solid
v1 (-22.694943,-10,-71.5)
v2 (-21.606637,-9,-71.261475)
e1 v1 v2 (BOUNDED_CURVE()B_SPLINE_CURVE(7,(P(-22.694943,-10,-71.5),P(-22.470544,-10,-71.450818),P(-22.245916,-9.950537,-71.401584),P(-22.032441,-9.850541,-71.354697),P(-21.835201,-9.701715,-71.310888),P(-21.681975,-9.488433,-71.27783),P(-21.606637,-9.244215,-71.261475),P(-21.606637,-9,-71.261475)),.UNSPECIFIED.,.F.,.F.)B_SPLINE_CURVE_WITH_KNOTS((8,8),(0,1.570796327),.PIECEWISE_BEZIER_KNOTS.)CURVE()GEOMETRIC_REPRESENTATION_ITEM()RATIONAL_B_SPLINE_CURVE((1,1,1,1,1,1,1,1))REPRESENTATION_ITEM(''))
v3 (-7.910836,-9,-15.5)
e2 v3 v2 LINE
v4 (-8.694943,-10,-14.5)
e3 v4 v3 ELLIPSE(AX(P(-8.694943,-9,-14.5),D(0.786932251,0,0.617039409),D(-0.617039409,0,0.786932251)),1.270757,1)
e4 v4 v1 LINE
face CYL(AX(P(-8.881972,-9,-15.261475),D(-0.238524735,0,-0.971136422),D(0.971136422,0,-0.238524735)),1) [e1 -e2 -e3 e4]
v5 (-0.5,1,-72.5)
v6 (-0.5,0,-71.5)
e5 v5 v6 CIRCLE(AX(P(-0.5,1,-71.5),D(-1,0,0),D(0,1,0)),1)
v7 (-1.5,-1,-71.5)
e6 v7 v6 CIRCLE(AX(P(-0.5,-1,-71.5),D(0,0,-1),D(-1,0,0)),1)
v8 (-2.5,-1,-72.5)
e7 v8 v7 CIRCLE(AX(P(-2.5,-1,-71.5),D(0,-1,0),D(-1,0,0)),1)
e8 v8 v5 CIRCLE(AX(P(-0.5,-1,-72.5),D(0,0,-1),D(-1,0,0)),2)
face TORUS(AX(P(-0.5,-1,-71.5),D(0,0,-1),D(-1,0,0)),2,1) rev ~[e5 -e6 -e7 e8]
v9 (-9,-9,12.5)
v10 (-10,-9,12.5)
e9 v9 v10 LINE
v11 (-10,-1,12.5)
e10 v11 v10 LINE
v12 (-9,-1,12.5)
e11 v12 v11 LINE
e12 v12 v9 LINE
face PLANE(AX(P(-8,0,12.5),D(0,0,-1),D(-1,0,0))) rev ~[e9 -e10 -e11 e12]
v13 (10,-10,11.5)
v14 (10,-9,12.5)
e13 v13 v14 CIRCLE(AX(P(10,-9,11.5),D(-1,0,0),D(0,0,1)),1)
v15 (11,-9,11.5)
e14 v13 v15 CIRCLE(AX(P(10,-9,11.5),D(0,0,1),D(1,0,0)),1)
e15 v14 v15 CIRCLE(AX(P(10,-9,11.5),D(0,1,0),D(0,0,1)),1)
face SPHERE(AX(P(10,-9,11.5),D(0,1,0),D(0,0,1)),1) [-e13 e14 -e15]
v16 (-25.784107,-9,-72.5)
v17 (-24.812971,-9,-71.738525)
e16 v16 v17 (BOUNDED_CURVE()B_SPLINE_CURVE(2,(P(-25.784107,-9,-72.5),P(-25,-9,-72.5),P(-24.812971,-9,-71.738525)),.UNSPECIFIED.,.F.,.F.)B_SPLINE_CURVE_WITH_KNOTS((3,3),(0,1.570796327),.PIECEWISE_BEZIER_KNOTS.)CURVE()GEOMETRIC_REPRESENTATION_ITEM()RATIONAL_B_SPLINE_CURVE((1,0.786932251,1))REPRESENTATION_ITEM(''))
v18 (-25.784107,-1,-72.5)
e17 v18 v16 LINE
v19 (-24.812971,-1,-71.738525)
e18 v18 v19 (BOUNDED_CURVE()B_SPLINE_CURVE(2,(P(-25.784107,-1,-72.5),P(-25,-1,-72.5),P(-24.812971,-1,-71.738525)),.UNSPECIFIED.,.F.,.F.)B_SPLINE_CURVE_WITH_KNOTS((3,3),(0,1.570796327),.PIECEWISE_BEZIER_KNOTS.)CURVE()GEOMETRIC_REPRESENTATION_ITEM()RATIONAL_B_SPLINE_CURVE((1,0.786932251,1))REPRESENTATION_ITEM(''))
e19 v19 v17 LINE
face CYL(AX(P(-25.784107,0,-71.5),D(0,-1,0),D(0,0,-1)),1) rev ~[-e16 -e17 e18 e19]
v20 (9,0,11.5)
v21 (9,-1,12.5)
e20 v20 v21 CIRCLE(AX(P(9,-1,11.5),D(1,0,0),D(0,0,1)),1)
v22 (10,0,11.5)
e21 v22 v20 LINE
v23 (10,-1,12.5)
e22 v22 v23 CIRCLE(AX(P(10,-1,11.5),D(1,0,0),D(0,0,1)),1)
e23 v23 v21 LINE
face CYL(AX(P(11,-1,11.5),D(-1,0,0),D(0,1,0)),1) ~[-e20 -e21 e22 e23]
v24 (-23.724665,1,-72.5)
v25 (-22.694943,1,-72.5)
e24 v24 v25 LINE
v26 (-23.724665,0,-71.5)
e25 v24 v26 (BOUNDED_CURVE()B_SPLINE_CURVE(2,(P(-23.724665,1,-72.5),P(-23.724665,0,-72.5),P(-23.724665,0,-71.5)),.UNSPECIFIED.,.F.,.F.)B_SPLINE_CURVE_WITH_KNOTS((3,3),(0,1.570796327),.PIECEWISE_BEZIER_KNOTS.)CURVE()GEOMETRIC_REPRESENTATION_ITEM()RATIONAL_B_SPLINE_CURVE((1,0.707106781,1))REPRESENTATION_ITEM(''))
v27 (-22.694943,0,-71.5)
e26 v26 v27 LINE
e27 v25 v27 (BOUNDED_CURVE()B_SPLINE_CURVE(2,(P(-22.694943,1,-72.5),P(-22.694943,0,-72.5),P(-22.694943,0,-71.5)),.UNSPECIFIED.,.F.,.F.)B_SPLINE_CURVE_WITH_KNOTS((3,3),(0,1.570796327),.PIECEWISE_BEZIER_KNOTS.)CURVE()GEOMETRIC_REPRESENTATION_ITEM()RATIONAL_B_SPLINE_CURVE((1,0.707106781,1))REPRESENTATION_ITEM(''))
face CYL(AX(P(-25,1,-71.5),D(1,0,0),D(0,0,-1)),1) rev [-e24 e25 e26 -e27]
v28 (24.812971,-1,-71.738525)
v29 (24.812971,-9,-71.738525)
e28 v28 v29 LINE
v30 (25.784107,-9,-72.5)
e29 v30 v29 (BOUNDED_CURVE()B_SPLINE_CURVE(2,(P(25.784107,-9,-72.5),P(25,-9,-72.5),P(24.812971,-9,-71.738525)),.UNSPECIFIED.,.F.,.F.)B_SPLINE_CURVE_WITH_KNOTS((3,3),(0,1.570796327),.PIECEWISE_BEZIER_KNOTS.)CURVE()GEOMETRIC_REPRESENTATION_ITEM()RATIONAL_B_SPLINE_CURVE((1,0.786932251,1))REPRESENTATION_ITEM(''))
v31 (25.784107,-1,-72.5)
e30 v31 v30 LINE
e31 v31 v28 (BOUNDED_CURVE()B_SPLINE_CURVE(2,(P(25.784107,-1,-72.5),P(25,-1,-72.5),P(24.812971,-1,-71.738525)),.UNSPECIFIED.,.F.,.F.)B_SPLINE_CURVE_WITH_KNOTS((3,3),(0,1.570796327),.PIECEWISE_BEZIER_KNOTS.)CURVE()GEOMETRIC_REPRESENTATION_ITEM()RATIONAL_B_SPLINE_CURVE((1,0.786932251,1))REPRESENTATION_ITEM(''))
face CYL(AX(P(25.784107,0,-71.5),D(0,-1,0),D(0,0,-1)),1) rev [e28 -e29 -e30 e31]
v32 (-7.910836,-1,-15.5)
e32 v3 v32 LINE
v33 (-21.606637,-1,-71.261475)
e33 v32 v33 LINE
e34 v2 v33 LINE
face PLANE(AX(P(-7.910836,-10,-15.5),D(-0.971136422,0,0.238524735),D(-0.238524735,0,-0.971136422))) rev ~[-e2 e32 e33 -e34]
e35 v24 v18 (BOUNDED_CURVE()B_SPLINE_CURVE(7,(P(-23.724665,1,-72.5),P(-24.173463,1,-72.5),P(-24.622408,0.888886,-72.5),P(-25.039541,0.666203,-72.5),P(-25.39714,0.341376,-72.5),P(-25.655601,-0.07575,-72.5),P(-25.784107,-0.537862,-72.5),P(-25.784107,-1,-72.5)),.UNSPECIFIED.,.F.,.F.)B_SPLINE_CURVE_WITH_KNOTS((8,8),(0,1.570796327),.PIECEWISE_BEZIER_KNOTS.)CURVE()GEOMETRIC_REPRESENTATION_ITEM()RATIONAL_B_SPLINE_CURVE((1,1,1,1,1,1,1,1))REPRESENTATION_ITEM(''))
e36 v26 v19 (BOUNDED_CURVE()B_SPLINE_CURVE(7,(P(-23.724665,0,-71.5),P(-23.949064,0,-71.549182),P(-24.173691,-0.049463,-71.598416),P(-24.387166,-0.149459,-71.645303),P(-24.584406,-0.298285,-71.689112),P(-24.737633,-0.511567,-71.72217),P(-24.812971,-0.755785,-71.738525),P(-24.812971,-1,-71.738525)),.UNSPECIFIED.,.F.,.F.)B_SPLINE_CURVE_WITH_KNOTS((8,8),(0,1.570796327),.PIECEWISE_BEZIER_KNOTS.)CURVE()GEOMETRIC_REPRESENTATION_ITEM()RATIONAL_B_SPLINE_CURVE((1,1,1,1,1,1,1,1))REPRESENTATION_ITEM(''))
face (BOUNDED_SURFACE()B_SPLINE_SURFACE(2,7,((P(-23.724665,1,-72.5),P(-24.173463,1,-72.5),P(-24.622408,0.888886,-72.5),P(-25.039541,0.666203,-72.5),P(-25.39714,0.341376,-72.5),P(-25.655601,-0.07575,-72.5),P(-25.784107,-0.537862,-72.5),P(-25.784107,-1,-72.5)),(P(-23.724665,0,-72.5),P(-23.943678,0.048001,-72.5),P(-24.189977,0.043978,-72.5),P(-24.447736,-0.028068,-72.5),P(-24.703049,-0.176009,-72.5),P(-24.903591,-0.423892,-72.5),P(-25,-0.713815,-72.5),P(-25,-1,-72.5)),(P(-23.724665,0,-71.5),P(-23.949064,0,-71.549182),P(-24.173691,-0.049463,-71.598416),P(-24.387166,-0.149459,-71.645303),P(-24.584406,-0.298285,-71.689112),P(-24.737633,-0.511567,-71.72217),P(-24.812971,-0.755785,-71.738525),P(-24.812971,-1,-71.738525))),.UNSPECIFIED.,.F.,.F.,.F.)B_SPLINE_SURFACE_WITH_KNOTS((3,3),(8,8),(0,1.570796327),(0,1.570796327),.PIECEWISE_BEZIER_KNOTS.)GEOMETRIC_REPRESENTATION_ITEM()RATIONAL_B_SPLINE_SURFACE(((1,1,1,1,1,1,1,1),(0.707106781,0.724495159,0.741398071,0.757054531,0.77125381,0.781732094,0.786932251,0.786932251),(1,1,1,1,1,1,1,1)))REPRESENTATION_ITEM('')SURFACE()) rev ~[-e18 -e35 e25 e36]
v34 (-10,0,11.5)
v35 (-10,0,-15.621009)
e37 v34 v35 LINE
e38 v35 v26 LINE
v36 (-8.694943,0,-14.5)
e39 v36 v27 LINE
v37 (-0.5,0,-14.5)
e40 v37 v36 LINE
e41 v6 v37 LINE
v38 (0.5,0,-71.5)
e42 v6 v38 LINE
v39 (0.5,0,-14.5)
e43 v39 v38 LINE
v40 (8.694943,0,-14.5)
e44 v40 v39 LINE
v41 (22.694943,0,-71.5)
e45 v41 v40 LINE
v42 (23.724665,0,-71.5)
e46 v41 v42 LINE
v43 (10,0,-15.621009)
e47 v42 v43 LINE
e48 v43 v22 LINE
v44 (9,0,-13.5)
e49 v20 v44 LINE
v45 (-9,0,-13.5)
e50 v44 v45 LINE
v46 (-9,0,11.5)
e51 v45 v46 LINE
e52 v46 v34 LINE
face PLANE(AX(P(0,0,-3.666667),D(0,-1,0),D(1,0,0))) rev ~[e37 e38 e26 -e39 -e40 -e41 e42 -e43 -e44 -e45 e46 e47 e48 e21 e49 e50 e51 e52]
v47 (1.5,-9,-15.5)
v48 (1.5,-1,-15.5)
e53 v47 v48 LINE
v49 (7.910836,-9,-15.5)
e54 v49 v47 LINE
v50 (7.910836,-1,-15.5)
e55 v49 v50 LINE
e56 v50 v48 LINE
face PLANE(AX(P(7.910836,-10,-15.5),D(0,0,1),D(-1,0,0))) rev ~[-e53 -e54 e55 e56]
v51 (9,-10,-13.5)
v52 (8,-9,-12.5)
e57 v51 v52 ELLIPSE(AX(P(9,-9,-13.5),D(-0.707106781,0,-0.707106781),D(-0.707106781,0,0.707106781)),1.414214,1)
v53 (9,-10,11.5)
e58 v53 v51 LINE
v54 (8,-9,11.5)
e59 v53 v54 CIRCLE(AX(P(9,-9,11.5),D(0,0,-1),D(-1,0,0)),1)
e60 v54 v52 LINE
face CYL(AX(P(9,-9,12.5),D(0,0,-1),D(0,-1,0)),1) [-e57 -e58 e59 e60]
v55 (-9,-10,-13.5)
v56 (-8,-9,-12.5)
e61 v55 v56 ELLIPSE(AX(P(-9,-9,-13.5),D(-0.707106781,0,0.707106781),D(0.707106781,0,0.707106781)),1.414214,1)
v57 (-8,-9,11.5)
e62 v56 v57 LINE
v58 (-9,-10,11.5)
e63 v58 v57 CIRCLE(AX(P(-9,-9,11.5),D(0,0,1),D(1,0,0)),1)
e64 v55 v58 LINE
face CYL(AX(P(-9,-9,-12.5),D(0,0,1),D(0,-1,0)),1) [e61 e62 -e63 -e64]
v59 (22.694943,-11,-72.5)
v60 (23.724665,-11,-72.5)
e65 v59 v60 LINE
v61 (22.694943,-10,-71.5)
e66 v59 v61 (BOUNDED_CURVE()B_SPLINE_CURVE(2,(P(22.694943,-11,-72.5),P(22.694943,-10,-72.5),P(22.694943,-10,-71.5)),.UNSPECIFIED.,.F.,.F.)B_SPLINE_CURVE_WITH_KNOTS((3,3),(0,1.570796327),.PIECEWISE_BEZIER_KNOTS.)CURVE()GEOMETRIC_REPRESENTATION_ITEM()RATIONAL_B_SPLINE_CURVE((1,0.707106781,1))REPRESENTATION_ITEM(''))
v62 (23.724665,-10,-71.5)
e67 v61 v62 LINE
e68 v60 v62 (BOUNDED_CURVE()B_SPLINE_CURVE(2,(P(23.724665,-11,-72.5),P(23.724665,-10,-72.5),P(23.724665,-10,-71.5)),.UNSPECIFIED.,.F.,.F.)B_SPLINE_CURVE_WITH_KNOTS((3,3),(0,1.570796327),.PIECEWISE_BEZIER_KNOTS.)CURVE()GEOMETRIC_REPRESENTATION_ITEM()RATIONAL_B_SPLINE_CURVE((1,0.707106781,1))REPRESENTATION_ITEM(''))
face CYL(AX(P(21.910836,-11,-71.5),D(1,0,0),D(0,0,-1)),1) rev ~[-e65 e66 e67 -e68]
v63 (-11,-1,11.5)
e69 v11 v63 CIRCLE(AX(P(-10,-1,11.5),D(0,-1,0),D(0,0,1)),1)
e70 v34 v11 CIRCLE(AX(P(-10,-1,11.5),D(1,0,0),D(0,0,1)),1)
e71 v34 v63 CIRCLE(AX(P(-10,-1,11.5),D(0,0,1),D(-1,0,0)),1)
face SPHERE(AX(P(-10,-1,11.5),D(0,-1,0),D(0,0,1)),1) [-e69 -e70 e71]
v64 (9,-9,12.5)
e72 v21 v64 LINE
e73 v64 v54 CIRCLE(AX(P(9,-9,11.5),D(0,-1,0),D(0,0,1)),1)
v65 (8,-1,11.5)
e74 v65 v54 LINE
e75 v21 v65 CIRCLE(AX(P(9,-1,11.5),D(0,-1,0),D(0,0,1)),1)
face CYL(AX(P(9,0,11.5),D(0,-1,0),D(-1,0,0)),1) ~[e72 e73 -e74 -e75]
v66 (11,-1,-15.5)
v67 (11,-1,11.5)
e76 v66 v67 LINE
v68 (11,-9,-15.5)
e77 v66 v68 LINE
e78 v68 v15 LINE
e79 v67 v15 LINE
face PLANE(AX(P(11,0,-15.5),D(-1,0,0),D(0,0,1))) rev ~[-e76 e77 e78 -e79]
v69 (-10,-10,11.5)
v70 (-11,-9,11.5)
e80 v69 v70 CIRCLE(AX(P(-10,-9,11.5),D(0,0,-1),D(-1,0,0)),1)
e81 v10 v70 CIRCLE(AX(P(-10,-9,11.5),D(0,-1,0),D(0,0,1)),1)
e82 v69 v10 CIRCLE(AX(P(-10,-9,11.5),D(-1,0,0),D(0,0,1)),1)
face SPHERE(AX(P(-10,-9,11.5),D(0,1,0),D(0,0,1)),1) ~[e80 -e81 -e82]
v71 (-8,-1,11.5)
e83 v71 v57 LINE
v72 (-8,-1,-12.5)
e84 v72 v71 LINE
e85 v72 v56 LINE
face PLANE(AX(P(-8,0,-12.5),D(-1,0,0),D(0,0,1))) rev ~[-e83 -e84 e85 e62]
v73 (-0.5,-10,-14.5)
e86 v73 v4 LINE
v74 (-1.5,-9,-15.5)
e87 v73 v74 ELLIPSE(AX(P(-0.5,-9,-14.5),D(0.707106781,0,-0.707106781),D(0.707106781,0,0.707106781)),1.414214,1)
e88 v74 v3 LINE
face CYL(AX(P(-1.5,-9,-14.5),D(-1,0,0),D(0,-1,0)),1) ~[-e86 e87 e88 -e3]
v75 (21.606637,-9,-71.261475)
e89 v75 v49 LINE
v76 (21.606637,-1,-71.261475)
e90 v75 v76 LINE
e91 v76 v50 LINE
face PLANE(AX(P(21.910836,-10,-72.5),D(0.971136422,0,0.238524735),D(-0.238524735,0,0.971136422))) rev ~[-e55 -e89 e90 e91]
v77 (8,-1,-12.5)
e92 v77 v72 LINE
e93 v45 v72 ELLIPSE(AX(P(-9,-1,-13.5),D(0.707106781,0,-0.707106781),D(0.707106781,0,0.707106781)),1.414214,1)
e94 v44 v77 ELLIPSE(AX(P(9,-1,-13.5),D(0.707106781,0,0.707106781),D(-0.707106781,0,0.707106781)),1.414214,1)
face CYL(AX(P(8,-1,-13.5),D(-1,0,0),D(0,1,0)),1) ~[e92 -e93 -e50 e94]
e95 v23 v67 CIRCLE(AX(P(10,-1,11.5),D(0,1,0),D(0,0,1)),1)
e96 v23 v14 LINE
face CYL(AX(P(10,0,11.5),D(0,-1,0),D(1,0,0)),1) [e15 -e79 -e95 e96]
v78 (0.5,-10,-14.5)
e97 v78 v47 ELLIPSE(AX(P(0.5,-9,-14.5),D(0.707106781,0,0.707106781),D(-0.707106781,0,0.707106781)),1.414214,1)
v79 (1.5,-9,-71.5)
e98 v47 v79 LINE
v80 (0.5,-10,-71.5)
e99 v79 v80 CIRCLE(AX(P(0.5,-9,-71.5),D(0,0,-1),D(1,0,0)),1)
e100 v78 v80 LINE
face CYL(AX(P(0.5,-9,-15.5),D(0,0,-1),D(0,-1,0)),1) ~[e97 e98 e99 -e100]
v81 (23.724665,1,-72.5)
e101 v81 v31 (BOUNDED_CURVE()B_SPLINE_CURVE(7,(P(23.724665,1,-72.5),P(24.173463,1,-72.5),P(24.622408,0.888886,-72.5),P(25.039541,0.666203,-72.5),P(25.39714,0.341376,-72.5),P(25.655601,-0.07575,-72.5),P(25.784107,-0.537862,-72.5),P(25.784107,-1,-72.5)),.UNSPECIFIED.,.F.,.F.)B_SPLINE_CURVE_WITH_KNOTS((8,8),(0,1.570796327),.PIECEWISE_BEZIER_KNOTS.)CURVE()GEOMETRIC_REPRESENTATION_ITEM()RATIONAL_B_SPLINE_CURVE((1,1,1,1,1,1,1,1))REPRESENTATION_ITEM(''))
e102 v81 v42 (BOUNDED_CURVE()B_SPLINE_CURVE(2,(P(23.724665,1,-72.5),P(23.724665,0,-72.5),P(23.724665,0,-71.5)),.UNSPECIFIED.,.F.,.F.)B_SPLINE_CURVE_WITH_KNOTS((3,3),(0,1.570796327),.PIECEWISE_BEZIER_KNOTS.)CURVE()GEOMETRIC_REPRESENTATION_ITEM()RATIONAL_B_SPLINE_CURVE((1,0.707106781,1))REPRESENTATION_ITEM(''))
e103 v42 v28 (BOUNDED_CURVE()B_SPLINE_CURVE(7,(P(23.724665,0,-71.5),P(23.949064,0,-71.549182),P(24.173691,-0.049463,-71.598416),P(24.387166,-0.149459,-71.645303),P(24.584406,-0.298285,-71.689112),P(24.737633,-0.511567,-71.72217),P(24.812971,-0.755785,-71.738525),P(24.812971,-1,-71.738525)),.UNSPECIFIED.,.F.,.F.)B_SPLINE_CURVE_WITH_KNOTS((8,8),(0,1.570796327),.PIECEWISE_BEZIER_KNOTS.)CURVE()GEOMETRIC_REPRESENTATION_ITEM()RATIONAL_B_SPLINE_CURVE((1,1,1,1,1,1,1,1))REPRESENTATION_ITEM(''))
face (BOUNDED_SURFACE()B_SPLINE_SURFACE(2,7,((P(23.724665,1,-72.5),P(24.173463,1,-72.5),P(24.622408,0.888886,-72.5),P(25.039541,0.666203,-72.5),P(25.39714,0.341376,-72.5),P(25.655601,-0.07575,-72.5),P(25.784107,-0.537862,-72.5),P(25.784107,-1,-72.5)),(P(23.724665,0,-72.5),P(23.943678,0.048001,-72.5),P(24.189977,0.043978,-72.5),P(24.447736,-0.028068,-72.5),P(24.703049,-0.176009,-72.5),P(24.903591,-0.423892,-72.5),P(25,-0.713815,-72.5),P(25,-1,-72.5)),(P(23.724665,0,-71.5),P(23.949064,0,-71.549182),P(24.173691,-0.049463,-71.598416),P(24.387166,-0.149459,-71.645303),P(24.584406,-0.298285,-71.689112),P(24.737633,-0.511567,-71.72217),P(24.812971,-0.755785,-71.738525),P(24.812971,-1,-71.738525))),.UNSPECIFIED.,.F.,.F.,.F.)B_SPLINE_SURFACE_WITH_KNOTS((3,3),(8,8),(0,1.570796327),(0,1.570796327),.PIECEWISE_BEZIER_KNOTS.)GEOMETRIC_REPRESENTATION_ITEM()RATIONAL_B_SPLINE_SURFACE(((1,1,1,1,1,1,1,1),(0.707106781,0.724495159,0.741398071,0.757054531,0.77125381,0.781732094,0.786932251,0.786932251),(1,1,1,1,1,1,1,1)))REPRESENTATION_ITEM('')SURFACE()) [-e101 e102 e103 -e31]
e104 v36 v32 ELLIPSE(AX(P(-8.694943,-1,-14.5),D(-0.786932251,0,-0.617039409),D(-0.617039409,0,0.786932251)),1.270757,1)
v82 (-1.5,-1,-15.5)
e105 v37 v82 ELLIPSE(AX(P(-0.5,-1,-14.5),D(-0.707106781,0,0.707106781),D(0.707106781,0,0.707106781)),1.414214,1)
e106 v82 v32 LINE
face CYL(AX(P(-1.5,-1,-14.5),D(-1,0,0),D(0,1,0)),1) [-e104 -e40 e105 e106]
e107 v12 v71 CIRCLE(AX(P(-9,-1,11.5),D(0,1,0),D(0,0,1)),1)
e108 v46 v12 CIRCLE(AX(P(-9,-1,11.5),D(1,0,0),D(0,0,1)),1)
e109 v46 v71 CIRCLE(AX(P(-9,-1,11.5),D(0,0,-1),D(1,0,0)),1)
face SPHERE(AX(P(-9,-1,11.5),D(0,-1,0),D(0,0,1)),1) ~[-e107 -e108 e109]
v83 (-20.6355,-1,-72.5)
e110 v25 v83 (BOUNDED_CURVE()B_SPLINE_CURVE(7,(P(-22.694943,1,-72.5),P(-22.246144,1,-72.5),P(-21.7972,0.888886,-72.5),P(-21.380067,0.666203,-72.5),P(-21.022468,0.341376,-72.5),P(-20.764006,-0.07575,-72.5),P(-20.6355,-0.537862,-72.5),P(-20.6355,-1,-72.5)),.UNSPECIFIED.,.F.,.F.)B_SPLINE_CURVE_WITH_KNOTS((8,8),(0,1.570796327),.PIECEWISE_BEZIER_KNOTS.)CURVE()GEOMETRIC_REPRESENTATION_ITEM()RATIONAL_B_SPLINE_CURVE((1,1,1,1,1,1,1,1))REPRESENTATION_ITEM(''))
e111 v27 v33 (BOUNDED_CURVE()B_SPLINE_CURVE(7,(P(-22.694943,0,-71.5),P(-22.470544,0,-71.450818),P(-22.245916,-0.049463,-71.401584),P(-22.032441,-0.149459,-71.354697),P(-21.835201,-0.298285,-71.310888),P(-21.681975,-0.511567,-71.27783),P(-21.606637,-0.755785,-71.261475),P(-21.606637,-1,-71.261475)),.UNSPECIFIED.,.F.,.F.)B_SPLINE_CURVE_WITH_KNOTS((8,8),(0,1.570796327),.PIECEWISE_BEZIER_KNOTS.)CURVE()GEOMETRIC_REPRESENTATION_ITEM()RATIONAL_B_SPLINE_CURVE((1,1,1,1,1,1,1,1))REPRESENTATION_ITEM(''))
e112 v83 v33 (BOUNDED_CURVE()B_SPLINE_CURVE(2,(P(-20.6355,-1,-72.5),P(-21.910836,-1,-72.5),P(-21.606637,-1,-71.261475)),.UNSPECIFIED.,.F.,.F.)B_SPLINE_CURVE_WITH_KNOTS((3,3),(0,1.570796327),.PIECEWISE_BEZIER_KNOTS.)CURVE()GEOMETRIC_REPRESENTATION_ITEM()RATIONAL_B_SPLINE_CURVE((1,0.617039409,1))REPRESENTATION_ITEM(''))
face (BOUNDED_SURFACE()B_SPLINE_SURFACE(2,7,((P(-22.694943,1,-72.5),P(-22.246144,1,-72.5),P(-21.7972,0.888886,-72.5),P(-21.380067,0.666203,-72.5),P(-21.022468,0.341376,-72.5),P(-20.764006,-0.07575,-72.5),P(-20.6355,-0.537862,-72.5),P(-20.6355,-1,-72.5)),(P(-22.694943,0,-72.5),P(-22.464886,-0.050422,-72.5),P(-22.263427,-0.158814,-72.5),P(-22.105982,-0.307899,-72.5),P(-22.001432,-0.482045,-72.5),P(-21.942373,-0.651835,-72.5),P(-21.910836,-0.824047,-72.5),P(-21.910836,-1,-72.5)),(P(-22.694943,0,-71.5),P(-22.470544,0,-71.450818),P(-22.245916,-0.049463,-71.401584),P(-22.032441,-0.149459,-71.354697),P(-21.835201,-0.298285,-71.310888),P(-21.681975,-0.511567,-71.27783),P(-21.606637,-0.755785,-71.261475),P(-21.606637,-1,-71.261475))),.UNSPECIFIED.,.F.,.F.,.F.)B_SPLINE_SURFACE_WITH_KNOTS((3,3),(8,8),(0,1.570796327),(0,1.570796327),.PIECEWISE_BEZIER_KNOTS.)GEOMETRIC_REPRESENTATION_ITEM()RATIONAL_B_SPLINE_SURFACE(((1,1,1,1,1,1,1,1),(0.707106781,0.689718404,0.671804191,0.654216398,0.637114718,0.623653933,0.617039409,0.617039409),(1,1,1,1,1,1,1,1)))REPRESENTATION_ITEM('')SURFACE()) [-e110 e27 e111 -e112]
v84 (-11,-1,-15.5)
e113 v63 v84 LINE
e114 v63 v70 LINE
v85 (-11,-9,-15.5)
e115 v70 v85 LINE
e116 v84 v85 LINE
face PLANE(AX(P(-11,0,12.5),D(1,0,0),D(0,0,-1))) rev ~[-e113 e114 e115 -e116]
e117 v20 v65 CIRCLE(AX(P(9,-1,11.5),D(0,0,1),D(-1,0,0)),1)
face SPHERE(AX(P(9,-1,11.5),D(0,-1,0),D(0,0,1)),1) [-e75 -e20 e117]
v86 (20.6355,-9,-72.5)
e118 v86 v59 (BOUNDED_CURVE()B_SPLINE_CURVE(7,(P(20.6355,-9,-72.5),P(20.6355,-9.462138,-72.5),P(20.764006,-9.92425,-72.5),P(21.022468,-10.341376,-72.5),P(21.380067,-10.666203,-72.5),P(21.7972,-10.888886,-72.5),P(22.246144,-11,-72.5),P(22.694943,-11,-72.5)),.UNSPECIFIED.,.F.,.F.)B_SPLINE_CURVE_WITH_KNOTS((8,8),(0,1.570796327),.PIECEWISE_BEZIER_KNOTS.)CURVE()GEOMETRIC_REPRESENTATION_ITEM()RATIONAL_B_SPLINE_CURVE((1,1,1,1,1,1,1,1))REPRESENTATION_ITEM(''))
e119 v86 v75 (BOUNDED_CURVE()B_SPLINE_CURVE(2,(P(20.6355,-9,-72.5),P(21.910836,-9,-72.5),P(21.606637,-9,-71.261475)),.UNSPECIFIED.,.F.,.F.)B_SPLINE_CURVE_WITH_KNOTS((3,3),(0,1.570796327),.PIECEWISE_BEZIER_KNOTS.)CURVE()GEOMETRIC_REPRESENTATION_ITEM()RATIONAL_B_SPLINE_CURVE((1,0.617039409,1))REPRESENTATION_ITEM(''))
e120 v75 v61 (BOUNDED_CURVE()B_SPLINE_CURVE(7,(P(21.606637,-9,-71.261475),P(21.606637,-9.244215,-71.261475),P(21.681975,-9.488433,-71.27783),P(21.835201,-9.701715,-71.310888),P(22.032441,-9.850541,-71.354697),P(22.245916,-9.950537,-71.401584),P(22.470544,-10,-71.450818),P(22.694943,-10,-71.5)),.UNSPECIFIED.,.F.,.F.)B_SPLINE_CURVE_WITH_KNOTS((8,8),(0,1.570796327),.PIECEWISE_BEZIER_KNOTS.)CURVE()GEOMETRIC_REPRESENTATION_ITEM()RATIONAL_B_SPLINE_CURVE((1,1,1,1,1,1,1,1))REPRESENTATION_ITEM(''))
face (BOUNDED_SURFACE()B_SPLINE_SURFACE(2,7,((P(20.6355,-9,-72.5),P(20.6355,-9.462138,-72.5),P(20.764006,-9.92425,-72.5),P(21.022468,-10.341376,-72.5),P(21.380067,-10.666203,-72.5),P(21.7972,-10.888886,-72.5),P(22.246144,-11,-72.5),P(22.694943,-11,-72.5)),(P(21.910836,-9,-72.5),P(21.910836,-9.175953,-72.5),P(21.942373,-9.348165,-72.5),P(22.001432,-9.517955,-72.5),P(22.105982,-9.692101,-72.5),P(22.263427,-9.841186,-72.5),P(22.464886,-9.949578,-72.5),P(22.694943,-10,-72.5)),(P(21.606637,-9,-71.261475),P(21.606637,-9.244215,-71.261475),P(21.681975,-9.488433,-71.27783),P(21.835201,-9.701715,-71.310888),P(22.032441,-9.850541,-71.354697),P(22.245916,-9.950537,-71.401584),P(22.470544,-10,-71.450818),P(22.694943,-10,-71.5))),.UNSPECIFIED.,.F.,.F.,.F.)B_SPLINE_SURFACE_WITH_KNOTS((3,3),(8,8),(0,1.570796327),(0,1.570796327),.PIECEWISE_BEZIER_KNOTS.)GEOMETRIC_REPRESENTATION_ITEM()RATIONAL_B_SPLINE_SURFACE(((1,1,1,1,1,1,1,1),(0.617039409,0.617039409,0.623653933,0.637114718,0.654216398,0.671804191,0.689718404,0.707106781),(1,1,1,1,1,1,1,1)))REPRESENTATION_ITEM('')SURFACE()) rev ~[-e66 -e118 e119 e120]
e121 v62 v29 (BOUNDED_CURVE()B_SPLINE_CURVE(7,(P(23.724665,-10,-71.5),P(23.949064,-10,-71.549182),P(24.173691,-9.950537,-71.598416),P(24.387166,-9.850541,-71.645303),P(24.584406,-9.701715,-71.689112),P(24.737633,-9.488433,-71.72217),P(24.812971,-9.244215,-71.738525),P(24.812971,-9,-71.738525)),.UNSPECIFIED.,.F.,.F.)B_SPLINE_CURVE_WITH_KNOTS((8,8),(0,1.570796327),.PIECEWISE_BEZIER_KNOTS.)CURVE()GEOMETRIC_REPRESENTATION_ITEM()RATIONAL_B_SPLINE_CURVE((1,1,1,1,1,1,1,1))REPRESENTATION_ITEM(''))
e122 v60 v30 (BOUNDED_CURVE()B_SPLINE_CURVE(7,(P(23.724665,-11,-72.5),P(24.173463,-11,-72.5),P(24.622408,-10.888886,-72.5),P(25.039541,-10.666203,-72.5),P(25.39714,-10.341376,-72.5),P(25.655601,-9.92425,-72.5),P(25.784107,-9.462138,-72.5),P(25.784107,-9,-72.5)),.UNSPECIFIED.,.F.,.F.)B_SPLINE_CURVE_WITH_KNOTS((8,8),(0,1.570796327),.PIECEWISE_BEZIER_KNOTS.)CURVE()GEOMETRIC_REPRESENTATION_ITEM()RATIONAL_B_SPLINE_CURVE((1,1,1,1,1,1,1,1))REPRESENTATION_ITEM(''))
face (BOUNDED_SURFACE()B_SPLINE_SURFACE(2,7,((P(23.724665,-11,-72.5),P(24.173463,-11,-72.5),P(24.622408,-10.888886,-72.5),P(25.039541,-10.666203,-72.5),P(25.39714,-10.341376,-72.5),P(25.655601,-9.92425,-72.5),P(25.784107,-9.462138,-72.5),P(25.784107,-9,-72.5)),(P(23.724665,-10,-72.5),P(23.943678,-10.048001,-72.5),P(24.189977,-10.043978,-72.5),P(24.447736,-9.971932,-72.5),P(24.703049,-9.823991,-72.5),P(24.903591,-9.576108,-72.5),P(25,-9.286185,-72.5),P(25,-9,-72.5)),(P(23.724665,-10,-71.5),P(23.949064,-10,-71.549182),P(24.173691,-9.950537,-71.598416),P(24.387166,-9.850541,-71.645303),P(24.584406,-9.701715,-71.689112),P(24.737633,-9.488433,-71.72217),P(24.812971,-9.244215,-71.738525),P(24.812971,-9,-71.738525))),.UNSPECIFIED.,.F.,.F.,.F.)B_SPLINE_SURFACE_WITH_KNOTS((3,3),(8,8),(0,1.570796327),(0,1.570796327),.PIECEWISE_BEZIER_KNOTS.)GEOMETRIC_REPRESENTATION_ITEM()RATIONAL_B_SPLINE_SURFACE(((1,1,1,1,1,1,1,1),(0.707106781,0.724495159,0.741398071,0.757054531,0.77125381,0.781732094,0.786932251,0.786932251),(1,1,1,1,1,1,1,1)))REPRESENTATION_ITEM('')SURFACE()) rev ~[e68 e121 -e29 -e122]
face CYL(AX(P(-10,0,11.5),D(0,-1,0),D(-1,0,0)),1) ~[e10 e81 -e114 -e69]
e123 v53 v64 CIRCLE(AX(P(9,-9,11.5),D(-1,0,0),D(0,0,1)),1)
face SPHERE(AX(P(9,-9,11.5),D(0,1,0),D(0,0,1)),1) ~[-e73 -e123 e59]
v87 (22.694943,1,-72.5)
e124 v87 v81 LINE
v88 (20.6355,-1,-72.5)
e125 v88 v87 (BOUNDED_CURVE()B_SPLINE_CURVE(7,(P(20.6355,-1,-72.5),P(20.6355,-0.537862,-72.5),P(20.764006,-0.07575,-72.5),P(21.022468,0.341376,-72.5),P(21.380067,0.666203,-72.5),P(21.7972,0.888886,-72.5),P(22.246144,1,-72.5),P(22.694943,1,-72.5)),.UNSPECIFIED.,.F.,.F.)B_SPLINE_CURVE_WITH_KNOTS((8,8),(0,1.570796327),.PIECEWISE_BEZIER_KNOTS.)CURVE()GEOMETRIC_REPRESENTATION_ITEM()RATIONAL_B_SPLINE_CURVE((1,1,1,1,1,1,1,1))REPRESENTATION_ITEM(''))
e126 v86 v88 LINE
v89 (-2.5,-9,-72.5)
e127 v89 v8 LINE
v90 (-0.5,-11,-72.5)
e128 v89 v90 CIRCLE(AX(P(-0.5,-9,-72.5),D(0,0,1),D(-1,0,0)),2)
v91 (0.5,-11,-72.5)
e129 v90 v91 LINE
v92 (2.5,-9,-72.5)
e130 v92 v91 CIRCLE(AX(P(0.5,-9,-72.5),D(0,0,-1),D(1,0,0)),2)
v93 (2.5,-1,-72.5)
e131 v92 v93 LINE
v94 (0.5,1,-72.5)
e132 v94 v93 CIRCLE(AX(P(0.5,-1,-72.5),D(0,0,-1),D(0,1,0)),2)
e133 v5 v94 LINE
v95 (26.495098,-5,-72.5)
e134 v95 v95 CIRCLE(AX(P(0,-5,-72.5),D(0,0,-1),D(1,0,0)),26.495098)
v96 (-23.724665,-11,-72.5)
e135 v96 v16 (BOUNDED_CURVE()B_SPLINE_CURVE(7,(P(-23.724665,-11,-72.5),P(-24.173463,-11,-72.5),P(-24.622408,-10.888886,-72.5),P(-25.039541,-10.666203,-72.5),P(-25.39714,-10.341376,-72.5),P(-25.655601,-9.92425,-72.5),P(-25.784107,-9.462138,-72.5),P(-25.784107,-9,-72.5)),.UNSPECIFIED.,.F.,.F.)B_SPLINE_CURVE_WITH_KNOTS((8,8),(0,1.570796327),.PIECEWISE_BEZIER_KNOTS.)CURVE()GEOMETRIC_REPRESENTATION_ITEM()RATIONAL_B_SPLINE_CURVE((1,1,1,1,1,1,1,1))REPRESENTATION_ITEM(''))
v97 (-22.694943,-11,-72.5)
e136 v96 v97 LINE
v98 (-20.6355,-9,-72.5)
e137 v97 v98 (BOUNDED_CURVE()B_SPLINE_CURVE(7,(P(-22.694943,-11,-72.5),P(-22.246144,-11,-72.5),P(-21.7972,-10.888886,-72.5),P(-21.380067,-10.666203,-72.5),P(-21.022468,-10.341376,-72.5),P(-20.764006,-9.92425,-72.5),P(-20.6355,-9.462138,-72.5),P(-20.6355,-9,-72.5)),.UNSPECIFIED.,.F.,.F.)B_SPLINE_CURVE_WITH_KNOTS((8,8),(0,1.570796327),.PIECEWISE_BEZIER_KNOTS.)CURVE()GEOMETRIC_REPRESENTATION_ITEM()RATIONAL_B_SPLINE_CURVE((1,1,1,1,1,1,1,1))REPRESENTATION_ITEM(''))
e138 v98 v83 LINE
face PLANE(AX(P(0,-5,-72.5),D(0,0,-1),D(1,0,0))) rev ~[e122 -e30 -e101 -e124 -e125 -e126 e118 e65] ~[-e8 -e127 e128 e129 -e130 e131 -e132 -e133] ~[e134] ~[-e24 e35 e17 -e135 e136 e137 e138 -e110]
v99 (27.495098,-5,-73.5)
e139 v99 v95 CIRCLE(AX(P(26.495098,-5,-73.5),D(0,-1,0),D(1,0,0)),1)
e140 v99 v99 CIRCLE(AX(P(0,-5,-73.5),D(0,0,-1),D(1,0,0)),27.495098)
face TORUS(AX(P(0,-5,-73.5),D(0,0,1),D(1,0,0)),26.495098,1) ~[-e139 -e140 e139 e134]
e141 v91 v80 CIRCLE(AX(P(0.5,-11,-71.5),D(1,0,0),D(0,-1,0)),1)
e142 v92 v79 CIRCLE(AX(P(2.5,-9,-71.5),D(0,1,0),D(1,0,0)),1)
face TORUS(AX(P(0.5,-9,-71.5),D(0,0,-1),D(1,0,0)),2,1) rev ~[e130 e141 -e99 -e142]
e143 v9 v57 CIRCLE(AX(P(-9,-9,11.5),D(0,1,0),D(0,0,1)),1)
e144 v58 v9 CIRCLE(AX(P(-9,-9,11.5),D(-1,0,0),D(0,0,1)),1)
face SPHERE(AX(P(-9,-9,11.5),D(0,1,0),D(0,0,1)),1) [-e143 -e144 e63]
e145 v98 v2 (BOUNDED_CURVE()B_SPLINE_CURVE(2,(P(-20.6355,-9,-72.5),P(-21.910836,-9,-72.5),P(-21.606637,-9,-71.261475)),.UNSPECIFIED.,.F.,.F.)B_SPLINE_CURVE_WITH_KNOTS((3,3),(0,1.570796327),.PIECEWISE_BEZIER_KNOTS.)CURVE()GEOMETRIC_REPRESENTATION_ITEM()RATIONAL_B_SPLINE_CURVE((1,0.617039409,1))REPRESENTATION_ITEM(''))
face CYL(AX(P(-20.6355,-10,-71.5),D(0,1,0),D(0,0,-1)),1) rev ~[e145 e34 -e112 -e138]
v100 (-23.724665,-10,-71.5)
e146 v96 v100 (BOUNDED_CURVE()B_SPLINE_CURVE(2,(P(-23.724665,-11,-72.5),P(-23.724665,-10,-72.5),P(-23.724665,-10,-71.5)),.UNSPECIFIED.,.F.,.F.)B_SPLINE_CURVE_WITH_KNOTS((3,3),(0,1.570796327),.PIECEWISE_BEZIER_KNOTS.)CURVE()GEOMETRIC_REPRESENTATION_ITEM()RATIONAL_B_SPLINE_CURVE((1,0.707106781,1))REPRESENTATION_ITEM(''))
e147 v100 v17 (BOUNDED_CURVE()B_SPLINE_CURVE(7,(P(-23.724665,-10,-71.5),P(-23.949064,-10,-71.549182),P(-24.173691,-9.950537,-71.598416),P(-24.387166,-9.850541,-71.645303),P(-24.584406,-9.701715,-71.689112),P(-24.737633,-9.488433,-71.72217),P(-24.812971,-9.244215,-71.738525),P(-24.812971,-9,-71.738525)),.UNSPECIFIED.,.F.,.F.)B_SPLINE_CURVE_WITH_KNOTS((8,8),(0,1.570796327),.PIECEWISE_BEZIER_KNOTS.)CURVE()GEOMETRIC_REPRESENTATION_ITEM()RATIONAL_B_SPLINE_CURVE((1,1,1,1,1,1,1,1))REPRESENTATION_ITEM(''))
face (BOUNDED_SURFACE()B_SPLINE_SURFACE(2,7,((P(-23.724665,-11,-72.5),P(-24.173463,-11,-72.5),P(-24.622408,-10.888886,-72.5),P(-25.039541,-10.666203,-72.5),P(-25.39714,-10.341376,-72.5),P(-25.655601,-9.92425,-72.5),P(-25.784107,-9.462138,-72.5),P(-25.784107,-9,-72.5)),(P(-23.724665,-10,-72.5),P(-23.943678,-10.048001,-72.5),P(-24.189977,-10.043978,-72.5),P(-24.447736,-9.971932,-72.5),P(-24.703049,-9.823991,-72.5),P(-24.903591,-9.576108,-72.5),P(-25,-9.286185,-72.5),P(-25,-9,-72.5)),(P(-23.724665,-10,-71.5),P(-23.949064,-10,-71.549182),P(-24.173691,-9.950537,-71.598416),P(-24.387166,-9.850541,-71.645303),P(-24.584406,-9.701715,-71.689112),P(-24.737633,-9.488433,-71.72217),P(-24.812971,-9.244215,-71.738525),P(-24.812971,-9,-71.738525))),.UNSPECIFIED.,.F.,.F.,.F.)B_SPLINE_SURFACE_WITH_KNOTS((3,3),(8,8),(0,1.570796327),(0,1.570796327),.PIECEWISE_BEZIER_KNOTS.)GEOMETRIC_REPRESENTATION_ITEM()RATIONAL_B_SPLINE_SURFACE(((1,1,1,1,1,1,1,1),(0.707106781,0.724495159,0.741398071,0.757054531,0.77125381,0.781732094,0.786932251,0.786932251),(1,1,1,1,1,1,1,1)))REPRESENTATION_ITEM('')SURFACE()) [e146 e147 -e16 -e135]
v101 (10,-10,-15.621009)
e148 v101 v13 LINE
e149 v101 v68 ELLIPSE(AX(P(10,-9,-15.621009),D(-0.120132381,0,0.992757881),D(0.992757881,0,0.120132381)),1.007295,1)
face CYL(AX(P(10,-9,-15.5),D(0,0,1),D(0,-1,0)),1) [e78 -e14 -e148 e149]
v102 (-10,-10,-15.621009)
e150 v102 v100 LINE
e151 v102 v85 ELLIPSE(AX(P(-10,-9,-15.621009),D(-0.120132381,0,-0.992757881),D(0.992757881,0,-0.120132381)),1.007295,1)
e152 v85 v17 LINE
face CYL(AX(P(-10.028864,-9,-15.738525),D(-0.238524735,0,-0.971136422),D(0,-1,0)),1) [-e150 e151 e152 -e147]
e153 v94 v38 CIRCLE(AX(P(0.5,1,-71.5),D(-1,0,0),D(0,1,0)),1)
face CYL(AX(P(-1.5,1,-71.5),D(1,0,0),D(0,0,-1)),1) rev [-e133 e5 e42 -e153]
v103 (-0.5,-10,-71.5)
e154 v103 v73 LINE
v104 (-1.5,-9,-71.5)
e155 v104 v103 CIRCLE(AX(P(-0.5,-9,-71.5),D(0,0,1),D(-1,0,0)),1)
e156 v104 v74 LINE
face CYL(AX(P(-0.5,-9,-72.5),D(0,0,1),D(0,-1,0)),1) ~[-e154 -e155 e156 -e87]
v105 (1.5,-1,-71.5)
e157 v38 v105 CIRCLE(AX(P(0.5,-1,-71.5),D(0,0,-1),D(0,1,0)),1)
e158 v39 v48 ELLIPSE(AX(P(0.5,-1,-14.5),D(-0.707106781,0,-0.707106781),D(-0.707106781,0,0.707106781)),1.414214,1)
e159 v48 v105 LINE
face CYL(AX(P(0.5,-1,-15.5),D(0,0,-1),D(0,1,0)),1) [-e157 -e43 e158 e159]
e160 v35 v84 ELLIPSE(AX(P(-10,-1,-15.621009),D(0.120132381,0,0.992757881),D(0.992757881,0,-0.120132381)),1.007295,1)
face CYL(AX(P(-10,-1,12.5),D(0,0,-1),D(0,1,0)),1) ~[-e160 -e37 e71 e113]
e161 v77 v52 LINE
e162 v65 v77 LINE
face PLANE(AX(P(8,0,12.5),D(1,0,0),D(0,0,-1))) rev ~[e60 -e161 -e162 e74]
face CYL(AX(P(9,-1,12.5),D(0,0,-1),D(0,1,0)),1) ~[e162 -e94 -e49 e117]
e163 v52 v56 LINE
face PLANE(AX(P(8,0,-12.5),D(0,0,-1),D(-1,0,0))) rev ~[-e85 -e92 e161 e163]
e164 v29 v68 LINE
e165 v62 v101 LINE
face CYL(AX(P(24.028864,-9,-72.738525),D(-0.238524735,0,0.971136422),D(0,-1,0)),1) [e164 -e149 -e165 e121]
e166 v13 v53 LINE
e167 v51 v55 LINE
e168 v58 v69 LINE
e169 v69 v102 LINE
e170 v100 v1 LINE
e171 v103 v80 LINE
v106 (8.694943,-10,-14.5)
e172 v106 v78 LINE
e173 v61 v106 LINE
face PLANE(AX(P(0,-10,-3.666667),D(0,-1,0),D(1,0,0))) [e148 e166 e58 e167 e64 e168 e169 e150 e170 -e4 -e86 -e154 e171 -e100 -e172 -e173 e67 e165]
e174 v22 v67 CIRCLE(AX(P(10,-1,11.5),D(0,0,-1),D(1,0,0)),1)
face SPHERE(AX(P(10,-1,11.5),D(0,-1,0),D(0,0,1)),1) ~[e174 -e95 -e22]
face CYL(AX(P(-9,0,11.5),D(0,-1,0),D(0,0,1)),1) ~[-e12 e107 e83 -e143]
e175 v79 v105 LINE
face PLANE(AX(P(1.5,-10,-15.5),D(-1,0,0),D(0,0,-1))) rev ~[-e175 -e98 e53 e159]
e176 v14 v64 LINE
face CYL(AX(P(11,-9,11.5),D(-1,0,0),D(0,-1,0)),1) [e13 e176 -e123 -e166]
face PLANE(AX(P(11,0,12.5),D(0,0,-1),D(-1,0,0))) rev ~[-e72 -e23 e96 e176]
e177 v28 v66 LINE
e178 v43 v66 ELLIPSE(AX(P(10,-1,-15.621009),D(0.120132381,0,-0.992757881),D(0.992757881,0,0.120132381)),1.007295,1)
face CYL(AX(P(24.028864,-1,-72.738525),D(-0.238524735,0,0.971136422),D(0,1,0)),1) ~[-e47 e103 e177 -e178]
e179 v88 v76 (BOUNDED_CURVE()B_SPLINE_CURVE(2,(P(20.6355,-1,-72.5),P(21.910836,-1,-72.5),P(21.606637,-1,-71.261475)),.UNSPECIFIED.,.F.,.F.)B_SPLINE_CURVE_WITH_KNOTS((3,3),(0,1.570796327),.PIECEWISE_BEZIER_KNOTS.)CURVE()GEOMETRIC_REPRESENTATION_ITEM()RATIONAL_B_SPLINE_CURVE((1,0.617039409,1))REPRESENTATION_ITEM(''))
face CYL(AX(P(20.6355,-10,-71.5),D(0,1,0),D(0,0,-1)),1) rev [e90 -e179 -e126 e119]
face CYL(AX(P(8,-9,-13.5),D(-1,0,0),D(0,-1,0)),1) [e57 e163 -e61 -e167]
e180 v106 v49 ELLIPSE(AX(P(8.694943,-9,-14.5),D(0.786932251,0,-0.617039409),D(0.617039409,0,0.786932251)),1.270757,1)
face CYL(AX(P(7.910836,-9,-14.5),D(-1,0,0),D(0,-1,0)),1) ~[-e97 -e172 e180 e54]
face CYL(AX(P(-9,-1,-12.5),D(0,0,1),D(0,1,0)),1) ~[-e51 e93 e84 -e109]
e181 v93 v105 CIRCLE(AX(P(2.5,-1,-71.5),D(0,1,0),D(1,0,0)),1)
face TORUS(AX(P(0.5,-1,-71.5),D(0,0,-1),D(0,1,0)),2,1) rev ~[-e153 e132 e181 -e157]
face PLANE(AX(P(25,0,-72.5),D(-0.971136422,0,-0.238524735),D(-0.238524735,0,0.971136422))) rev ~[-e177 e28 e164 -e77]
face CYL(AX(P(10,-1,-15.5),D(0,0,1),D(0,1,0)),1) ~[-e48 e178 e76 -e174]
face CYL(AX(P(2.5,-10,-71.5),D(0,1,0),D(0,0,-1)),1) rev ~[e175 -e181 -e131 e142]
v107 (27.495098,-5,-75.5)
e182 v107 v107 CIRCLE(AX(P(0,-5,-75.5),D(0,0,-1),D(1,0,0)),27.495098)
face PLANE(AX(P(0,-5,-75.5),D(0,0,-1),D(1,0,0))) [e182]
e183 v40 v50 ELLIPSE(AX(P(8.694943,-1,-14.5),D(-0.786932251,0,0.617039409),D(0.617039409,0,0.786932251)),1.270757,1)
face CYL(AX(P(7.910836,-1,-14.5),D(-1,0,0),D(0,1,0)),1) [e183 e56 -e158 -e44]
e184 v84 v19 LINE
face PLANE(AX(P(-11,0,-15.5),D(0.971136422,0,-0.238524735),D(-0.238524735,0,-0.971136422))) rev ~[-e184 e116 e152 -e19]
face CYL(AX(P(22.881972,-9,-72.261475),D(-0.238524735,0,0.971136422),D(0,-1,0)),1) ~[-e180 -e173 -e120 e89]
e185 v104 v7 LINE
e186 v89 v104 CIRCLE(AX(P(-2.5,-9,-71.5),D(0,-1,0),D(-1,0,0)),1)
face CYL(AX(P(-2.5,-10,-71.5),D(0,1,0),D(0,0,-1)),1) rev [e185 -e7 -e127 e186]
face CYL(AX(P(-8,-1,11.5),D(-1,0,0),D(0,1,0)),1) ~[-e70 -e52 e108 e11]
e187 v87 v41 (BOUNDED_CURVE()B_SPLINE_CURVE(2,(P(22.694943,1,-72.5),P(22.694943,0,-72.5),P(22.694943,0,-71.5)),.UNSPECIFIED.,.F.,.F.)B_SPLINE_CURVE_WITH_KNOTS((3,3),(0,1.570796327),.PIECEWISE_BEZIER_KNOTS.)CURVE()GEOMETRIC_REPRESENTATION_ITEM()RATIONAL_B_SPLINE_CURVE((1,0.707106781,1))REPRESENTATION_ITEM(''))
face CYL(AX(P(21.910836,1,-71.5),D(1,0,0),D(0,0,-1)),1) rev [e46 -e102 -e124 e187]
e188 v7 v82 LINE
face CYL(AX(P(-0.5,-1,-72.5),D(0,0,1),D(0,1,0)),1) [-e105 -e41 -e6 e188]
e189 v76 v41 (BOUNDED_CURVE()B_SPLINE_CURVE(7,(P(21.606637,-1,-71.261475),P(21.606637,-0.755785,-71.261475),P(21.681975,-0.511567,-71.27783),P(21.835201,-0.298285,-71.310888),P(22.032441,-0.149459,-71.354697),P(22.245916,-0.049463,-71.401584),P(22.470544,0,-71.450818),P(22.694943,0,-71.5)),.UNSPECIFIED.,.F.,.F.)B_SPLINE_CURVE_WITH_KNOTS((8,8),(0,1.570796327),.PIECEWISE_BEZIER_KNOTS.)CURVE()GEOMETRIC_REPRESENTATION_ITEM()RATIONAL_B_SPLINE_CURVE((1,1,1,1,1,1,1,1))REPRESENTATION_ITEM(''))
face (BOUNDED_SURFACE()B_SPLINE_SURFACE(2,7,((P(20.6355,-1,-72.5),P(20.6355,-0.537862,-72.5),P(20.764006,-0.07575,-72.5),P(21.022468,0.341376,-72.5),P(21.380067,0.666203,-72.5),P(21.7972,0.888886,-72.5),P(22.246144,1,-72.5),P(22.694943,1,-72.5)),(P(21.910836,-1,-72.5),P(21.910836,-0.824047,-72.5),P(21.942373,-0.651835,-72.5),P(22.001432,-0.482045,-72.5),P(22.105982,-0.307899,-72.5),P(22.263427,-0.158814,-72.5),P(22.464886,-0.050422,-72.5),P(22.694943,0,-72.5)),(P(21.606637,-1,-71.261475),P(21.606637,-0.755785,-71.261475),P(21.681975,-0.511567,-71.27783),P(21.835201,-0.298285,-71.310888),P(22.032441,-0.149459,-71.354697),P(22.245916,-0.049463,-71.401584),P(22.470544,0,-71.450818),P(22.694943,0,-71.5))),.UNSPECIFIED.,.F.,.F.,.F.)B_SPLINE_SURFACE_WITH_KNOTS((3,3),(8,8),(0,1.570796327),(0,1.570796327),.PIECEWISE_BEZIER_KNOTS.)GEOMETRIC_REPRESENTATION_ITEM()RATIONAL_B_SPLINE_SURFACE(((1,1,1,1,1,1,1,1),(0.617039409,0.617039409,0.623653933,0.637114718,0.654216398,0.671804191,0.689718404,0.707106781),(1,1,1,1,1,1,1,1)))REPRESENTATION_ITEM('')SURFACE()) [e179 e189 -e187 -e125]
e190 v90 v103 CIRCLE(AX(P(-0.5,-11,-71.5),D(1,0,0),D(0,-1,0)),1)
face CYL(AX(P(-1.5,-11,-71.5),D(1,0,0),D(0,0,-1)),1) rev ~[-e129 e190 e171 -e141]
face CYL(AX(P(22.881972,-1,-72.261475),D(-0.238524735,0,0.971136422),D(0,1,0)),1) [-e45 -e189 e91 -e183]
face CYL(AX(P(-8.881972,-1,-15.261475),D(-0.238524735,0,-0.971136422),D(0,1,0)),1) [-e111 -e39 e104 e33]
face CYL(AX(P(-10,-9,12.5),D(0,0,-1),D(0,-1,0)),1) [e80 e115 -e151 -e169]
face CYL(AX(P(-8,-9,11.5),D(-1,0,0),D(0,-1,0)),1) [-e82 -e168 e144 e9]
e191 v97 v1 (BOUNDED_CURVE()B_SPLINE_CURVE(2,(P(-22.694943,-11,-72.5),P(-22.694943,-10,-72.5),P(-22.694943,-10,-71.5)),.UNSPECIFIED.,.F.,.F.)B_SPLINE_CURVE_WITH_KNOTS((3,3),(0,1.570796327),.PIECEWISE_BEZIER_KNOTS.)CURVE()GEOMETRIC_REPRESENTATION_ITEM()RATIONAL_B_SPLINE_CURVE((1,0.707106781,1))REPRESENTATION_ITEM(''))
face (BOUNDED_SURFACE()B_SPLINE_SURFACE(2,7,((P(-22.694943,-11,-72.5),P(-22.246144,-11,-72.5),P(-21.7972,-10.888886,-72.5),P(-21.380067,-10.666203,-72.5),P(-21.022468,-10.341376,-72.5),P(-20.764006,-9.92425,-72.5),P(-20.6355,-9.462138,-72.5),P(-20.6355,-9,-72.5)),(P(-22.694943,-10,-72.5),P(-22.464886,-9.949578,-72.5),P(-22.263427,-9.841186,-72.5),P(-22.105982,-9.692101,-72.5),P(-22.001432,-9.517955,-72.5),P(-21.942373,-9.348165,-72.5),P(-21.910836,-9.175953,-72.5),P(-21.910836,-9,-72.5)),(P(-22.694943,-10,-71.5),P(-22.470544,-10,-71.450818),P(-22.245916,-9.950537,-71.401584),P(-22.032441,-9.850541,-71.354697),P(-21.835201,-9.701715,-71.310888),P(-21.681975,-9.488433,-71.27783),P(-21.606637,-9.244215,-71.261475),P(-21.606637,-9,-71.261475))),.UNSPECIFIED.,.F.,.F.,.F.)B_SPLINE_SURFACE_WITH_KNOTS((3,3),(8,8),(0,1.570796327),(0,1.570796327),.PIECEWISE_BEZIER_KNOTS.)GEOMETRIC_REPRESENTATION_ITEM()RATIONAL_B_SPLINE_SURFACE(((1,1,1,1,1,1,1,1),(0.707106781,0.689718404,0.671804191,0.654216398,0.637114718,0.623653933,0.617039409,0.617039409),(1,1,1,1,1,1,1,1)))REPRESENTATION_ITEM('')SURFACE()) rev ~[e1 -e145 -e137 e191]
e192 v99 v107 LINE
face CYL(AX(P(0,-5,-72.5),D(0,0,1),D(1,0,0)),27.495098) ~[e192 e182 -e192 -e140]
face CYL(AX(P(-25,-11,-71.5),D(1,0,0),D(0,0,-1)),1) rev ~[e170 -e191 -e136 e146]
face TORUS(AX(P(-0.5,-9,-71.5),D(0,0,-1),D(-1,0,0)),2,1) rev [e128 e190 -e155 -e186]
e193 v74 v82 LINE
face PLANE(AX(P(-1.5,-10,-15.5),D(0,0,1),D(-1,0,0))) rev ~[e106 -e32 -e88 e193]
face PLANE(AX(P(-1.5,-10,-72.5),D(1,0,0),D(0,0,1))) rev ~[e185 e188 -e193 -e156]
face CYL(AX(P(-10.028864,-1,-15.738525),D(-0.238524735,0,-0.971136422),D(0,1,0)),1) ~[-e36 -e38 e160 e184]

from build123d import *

# Parameters (mm, degrees)
F1_DEPTH = 10
F3_DEPTH = 25
F4_R     = 27.495097568
F5_DEPTH = 3
F6_R     = 1


# Not quite as in the source:
# - a feature names something its author has since deleted; it is built from what else it names


with BuildPart() as f1:
    # F0 (on Front) → F1 (new body)
    with BuildSketch(Plane.XZ):
        Polygon((11, 12.5), (8, 12.5), (8, -12.5), (-8, -12.5), (-8, 12.5), (-11, 12.5), (-11, -15.5), (11, -15.5), align=None)
        Polygon((25, -72.5), (11, -15.5), (-11, -15.5), (-25, -72.5), align=None)
    extrude(amount=F1_DEPTH)

    # F2 (on face) → F3 (cut)
    with BuildSketch(Plane.XZ.offset(10)):
        Polygon((-1.5, -15.5), (-7.9108356651, -15.5), (-21.9108356651, -72.5), (-1.5, -72.5), align=None)
        Polygon((1.5, -15.5), (1.5, -72.5), (21.9108356651, -72.5), (7.9108356651, -15.5), align=None)
    extrude(amount=-F3_DEPTH, mode=Mode.SUBTRACT)

    # F4 (on face) → F5 (join)
    with BuildSketch(Plane(origin=(0, 0, -72.5), x_dir=(1, 0, 0), z_dir=(0, 0, -1))):
        with Locations((0, 5)):
            Circle(F4_R)
    extrude(amount=F5_DEPTH)

    # F6
    f6_edges = [f1.edges().sort_by_distance(p)[0] for p in [
        (-8, -5, 12.5),
        (8, -5, 12.5),
        (11, -5, 12.5),
        (-11, -5, 12.5),
        (9.5, -10, 12.5),
        (-9.5, -10, 12.5),
        (9.5, 0, 12.5),
        (-9.5, 0, 12.5),
        (-11, 0, -1.5),
        (11, 0, -1.5),
        (11, -10, -1.5),
        (-11, -10, -1.5),
        (-18, -10, -44),
        (18, -10, -44),
        (-18, 0, -44),
        (18, 0, -44),
        (0, -10, -72.5),
        (23.455418, -10, -72.5),
        (14.910836, -10, -44),
        (4.705418, -10, -15.5),
        (1.5, -10, -44),
        (-1.5, -10, -44),
        (-4.705418, -10, -15.5),
        (-14.910836, -10, -44),
        (-23.455418, -10, -72.5),
        (-8, -10, 0),
        (0, -10, -12.5),
        (8, -10, 0),
        (23.455418, 0, -72.5),
        (14.910836, 0, -44),
        (4.705418, 0, -15.5),
        (1.5, 0, -44),
        (0, 0, -72.5),
        (-1.5, 0, -44),
        (-4.705418, 0, -15.5),
        (-14.910836, 0, -44),
        (-23.455418, 0, -72.5),
        (-8, 0, 0),
        (0, 0, -12.5),
        (8, 0, 0),
        (-27.495098, -5, -72.5),
        (-21.910836, -5, -72.5),
        (-25, -5, -72.5),
        (1.5, -5, -72.5),
        (-1.5, -5, -72.5),
        (25, -5, -72.5),
        (21.910836, -5, -72.5),
    ]]
    fillet(f6_edges, radius=F6_R)


solid = f1.part
